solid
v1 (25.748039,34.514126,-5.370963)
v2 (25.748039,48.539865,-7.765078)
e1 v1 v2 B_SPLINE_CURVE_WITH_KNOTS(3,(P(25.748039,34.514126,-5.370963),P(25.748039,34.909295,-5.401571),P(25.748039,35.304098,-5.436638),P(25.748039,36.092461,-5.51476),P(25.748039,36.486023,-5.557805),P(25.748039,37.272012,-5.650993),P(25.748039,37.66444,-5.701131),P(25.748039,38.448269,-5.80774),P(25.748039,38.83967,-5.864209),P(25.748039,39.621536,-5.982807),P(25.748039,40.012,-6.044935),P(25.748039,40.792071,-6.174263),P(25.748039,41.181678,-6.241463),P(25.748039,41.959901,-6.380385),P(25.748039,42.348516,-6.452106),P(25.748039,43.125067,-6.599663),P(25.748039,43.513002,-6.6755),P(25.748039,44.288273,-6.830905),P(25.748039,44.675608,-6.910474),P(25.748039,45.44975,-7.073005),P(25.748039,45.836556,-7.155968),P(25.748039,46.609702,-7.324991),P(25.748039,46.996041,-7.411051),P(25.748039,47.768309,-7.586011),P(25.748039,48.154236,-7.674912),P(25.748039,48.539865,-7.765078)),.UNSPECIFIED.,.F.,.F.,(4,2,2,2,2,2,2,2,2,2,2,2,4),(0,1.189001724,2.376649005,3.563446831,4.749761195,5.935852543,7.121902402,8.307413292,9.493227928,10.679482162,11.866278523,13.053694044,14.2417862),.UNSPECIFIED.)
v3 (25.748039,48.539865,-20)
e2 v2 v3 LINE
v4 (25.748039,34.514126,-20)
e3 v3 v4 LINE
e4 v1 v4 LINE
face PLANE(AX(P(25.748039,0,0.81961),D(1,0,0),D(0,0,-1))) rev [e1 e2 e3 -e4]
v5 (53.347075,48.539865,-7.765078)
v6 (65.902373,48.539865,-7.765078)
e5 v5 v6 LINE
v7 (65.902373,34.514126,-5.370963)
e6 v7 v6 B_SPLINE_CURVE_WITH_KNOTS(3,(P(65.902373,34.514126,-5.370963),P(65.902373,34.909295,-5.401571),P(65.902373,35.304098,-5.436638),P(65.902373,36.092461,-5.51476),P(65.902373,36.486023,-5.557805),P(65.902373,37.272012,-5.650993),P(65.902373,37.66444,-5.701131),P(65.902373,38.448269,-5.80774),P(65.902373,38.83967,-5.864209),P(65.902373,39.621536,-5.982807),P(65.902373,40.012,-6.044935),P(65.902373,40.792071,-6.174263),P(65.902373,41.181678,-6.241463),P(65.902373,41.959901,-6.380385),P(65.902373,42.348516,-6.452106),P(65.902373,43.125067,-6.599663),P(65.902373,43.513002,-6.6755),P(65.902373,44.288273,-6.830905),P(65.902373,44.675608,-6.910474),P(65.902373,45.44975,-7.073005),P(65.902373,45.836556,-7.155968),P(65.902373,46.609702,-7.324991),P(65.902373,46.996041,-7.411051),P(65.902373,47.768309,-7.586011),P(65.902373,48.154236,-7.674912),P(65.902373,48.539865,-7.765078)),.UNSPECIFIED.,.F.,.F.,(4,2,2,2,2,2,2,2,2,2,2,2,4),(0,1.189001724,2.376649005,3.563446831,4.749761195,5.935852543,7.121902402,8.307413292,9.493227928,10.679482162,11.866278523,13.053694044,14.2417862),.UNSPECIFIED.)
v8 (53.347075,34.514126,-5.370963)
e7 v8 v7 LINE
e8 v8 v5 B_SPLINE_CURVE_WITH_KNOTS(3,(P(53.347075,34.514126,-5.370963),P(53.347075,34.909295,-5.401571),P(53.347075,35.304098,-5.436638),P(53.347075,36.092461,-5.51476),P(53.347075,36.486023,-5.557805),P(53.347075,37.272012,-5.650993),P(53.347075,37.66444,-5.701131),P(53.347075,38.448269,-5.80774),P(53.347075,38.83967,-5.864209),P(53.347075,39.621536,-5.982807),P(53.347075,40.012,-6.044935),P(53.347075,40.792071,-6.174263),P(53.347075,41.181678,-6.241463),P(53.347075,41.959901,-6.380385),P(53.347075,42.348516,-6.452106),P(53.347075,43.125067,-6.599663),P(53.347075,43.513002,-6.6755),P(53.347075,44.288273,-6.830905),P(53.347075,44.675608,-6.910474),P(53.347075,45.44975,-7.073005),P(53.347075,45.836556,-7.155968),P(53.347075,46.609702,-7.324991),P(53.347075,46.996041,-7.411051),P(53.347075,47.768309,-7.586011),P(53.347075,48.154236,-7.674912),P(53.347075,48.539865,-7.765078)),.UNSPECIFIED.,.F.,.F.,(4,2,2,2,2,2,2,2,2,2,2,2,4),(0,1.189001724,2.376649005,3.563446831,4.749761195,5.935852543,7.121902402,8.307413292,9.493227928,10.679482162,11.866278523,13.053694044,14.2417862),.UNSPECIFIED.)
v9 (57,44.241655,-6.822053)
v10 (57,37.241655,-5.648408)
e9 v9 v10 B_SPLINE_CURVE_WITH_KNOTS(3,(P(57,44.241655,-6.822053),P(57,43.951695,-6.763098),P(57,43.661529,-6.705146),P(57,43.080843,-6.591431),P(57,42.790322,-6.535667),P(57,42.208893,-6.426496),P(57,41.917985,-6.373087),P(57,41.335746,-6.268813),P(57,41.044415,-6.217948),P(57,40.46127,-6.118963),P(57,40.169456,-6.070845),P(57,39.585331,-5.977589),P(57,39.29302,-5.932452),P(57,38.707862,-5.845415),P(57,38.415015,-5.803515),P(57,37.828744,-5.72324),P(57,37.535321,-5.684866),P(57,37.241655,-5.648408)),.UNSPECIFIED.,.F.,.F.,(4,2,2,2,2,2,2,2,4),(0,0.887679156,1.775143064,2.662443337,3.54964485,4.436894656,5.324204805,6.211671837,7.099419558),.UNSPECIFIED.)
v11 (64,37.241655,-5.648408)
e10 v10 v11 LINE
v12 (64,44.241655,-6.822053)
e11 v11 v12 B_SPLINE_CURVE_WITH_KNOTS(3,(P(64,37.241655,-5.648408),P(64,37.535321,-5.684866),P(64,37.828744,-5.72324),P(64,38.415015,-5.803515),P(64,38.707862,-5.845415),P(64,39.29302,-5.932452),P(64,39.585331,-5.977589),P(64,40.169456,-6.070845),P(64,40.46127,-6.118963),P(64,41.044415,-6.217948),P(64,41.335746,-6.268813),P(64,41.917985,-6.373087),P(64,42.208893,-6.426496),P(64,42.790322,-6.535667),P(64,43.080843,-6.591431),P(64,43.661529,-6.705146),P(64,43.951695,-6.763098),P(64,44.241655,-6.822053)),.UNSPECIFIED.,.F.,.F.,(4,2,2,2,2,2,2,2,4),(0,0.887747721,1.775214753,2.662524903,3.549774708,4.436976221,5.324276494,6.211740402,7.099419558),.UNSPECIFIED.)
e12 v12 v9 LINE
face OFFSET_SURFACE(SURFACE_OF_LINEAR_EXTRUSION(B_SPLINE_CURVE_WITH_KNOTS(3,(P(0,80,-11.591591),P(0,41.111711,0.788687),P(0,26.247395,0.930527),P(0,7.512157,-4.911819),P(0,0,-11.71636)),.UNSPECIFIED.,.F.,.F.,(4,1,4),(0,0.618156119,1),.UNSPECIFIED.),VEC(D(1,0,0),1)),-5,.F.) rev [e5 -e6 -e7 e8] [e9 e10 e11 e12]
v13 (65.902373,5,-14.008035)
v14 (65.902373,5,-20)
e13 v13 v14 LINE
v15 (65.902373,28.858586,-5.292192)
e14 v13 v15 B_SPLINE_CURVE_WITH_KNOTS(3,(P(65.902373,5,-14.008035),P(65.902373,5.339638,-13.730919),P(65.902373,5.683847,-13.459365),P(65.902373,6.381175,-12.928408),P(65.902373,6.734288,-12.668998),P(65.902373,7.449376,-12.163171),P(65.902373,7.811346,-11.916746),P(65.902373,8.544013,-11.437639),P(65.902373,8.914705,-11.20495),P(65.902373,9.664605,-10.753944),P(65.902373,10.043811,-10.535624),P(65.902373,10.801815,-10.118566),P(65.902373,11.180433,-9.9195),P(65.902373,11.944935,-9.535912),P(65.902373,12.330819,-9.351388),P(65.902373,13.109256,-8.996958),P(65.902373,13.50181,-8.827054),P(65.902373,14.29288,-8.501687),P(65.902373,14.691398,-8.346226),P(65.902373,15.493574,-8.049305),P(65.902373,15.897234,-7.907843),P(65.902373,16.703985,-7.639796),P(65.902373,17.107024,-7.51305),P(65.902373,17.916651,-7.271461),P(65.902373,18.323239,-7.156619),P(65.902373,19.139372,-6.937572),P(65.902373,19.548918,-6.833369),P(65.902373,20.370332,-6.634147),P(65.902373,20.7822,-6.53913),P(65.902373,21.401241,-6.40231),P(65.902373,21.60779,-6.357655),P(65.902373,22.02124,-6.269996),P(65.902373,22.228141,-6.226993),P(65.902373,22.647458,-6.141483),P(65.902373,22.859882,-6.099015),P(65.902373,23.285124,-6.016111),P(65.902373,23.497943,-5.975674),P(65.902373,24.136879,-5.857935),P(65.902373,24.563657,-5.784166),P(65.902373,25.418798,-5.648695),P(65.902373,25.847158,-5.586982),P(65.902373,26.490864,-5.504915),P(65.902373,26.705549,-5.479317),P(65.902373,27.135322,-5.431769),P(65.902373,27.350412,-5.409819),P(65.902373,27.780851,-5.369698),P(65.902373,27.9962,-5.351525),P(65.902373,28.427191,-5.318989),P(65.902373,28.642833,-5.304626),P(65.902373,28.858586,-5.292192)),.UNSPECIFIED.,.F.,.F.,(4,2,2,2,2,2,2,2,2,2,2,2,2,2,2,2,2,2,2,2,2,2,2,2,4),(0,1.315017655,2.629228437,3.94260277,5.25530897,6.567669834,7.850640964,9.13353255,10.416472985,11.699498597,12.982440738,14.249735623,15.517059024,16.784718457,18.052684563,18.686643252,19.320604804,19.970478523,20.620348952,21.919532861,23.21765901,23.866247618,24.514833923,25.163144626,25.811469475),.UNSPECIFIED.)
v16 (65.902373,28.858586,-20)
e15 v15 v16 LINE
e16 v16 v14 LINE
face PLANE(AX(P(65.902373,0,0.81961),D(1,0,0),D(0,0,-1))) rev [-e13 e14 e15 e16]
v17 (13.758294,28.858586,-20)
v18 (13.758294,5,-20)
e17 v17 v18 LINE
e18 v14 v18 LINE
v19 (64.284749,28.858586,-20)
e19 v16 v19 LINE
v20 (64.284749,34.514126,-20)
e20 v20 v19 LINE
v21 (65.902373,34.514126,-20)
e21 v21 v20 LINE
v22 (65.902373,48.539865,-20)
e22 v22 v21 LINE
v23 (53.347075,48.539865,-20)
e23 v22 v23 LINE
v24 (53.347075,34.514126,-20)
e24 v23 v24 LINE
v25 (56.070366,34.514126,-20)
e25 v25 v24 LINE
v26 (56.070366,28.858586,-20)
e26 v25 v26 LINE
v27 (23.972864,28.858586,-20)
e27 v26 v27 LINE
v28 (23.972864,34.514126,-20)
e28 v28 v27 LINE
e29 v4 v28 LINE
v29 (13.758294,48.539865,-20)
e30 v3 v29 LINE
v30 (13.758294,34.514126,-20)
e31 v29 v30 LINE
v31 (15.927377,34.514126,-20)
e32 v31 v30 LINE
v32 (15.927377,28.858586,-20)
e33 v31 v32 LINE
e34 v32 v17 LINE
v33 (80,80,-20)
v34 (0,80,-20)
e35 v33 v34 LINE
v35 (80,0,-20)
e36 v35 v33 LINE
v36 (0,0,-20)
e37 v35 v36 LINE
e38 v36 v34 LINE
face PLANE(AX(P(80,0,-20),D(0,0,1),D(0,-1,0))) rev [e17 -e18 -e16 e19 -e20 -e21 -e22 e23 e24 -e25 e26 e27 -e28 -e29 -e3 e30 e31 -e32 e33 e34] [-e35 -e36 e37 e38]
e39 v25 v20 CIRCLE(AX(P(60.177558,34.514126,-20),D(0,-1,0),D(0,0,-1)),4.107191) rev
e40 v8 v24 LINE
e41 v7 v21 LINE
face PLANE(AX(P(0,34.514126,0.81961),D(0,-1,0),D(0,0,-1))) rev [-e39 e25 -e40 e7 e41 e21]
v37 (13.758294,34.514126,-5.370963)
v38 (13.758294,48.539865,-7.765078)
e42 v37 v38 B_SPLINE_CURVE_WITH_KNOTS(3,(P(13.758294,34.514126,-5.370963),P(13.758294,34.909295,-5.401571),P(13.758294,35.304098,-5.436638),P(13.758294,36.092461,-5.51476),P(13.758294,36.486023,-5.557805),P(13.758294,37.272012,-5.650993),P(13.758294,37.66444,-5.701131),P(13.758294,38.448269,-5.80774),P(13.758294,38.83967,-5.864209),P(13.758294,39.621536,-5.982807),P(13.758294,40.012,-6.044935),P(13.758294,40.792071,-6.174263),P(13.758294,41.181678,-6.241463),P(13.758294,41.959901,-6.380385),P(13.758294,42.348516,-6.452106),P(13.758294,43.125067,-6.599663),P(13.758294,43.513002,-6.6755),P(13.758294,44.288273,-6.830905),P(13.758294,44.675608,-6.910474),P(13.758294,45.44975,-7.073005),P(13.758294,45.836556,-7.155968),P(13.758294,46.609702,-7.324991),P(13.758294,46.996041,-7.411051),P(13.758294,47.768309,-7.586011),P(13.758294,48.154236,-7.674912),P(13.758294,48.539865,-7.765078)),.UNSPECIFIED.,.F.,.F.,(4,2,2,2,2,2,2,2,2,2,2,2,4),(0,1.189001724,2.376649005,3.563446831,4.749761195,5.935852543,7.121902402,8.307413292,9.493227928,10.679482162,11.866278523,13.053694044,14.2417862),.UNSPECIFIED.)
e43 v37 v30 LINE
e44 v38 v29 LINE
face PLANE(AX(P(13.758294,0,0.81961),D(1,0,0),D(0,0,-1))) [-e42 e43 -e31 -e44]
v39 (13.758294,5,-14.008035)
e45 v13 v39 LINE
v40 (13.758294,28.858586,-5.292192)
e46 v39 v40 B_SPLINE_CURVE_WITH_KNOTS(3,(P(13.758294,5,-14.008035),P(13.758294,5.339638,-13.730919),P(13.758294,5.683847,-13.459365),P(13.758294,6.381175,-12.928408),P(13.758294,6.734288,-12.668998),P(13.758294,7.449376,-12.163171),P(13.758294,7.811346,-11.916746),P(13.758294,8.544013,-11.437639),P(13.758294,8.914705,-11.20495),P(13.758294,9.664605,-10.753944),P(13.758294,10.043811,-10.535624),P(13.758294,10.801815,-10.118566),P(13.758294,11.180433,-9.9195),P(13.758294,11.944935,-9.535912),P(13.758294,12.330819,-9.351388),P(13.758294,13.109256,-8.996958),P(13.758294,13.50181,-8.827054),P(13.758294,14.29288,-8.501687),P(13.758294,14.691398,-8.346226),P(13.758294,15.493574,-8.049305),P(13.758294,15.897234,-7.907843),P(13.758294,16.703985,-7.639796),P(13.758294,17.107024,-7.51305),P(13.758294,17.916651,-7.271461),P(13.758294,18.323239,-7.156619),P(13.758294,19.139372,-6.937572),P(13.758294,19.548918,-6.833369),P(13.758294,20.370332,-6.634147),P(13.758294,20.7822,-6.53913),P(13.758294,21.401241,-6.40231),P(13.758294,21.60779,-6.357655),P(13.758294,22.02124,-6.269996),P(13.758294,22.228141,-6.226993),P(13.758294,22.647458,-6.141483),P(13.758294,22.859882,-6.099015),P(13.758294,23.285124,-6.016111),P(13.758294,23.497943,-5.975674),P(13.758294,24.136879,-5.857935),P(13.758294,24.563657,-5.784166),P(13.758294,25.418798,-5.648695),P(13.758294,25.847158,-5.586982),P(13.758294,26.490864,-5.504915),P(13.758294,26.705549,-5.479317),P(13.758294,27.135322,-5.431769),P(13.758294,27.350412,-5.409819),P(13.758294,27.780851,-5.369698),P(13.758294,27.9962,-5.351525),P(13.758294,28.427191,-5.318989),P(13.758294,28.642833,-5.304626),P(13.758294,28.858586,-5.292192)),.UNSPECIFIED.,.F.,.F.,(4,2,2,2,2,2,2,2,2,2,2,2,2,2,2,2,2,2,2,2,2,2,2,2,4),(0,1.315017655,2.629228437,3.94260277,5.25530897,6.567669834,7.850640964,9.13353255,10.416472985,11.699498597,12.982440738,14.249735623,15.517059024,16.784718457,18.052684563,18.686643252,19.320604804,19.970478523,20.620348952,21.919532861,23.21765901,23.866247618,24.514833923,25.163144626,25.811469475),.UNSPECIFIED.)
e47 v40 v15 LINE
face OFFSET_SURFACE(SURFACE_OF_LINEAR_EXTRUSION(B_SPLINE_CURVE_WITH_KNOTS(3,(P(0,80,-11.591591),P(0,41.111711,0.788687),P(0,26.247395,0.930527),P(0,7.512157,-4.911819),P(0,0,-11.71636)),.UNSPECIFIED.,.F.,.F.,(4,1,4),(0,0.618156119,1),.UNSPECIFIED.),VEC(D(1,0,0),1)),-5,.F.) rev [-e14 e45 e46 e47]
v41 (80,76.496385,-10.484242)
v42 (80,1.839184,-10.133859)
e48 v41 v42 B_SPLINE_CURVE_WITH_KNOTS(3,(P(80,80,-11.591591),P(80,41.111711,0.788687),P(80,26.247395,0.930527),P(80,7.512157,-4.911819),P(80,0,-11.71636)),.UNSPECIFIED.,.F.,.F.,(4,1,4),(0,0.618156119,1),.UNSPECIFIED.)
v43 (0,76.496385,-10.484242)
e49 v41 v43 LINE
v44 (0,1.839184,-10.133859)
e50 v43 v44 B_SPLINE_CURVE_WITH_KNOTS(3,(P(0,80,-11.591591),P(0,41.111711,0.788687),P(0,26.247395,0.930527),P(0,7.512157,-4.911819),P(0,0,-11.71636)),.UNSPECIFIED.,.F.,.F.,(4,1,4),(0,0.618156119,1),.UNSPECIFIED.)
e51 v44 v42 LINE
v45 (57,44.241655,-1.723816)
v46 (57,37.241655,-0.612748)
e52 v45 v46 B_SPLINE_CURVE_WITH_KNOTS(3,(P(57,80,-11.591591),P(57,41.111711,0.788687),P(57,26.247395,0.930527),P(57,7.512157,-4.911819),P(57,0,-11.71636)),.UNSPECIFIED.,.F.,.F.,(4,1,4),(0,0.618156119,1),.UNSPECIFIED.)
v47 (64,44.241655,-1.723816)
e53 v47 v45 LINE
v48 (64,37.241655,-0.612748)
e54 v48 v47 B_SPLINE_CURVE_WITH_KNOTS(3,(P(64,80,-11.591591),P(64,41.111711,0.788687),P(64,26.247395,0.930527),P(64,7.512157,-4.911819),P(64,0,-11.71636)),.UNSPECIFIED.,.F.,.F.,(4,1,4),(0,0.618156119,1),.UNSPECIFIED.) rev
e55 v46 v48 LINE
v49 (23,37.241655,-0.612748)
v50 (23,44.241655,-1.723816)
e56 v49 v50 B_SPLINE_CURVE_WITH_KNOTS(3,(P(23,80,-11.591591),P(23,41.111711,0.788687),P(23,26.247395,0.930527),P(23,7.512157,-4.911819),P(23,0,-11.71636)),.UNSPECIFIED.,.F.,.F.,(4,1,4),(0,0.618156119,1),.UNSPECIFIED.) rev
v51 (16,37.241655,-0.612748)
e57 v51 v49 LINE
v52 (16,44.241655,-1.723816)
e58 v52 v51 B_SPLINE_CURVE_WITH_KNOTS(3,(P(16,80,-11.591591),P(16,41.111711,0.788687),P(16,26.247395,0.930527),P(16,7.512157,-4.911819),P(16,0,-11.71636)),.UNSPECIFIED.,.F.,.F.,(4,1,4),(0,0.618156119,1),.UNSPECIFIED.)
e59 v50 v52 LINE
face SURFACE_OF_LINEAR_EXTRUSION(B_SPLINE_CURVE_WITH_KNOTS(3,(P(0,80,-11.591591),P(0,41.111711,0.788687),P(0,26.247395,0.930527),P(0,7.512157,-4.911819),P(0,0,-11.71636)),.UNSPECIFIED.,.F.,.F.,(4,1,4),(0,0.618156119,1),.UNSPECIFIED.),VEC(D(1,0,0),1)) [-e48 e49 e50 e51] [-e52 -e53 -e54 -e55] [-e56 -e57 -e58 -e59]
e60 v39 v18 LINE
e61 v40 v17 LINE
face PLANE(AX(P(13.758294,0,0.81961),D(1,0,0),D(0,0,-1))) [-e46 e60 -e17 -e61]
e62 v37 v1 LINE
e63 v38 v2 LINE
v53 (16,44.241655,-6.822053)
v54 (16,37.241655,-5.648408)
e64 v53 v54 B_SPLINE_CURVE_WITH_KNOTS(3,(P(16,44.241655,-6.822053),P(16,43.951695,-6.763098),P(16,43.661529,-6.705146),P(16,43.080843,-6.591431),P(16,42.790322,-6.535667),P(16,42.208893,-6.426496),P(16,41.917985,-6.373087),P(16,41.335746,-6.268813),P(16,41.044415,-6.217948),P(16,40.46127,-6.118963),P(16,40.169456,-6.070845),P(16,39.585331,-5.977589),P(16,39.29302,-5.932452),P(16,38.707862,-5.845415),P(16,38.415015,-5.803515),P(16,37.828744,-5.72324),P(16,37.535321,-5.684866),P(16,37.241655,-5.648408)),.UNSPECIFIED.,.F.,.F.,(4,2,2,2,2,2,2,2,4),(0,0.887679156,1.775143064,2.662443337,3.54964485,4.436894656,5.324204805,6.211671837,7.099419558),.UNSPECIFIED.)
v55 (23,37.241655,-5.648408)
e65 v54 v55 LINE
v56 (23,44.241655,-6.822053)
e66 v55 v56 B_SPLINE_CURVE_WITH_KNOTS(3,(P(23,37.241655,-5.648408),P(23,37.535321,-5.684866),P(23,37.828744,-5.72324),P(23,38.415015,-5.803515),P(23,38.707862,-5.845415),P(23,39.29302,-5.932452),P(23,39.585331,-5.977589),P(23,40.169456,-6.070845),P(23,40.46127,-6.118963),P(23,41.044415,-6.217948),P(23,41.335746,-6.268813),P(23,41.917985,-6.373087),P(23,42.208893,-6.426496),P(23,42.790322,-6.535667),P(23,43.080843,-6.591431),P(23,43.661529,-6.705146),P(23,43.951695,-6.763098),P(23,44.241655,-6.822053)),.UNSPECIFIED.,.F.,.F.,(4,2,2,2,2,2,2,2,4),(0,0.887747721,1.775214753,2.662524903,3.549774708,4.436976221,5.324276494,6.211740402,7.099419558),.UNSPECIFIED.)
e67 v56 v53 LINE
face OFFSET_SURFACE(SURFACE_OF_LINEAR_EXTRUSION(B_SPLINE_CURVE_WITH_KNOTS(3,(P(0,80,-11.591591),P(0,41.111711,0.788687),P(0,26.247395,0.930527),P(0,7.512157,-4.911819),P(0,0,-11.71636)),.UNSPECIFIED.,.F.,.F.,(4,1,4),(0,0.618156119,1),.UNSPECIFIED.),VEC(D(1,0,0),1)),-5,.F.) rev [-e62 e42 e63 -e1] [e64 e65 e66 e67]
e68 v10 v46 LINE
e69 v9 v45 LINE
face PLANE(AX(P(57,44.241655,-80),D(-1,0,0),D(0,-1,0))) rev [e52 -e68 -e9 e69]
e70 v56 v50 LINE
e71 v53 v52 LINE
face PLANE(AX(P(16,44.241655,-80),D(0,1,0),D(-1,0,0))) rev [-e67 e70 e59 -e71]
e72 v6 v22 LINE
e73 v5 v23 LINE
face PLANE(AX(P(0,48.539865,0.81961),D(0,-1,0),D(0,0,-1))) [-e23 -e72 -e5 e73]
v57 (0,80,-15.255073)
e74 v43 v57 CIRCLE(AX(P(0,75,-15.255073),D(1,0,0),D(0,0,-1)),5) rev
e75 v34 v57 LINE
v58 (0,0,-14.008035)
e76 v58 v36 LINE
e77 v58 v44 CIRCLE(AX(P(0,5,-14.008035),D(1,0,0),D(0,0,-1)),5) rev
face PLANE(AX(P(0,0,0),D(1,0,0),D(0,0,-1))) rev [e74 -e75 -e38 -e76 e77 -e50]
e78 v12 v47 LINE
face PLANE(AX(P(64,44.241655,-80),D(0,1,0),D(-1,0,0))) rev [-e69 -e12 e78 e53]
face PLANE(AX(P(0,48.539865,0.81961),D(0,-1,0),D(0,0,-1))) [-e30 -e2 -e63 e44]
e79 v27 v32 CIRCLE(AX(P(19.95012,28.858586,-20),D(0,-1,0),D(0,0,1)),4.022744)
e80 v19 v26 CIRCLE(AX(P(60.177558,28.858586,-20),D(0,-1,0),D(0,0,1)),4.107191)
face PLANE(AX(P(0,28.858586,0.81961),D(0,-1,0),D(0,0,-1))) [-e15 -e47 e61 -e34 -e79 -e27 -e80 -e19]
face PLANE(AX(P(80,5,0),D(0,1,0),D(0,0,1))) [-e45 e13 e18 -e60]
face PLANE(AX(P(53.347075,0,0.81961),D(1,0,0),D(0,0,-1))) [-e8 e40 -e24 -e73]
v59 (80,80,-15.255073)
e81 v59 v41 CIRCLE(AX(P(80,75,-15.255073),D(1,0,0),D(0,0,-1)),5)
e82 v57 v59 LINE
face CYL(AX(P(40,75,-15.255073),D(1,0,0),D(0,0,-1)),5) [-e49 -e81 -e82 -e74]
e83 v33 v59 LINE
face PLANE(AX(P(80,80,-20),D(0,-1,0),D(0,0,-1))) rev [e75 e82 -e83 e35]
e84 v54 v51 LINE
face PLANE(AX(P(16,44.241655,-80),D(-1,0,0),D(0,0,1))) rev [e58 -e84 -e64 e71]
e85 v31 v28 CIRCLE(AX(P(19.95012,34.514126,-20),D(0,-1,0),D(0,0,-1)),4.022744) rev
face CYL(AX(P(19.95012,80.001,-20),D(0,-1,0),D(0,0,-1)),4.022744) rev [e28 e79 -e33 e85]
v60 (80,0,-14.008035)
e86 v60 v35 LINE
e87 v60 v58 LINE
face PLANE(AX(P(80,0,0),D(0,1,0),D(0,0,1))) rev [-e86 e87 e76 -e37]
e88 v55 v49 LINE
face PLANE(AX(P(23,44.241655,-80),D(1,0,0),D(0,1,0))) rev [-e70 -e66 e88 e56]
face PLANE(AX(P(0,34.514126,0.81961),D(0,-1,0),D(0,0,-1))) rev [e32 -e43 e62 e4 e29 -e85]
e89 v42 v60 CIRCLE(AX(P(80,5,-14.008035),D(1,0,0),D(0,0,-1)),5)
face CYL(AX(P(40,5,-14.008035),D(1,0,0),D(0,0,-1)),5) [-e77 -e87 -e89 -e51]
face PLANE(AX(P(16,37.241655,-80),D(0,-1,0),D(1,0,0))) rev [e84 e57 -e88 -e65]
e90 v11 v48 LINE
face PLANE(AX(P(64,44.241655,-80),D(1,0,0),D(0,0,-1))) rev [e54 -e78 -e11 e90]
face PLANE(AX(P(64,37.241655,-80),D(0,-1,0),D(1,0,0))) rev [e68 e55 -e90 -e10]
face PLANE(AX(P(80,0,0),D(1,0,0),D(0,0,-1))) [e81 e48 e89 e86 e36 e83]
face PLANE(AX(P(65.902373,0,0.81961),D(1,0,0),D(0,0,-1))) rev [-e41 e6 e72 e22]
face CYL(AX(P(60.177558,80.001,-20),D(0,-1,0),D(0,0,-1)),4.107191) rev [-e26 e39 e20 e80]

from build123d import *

# Parameters (mm, degrees)
SKETCH_1_W          = 20
SKETCH_1_H          = 80
EXTRUDE_1_DEPTH     = 80
CUT_EXTRUDE_1_DEPTH = 80
FILLET_1_R          = 5
SHELL_START         = 5
SHELL_3_DEPTH       = 70
SKETCH_3_W          = 7
SKETCH_3_H          = 7
CUT_EXTRUDE_3_DEPTH = 80
EXTRUDE_2_REACH     = 116.851
SKETCH_5_W          = 27.599035465
SKETCH_5_H          = 14.025739335
CUT_EXTRUDE_4_REACH = 99.033


# Read off the part's stored shape, not the designer's step: 쉘3
with BuildPart() as part:
    # 스케치1 → 보스-돌출1 (new body)
    with BuildSketch(Plane(origin=(0, 0, 0), x_dir=(0, 0, -1), z_dir=(1, 0, 0))):
        with Locations((10, 40)):
            Rectangle(SKETCH_1_W, SKETCH_1_H)
    extrude(amount=EXTRUDE_1_DEPTH)

    # 스케치2 → 컷-돌출1 (cut)
    with BuildSketch(Plane(origin=(80, 0, 0), x_dir=(0, 0, -1), z_dir=(1, 0, 0))):
        with BuildLine():
            Line((11.591590564, 80), (0, 80))
            Line((0, 80), (0, 0))
            Line((0, 0), (11.716359911, 0))
            add(Edge.make_bspline(
                [(11.591590564, 80), (-0.788687354, 41.111711297), (-0.930526633, 26.247395441), (4.911818792, 7.512157383), (11.716359911, 0)],
                knots=[0, 0, 0, 0, 0.618156119, 1, 1, 1, 1], degree=3))
        make_face()
    extrude(amount=-CUT_EXTRUDE_1_DEPTH, mode=Mode.SUBTRACT)

    # 필렛1
    fillet_1_edges = [part.edges().sort_by_distance(p)[0] for p in [
        (40, 0, -11.716359911),
        (40, 80, -11.591590564),
    ]]
    fillet(fillet_1_edges, radius=FILLET_1_R)

    # 쉘3 outline → 쉘3 (cut)
    with BuildSketch(Plane.YZ.offset(SHELL_START)):
        with BuildLine():
            Line((75, -20), (74.999999784, -15.255073686))
            add(Edge.make_bspline(
                [(74.999999784, -15.255073686), (67.829779133, -13.006113736), (61.460626662, -11.089637393), (55.828308111, -9.484643566), (50.869216464, -8.170232316), (46.521341581, -7.124664573), (42.721071813, -6.328318286), (39.413038096, -5.75562944), (36.528279577, -5.38717997), (34.019435823, -5.193621195), (31.801971368, -5.138118071), (29.778808064, -5.199766787), (27.603301228, -5.385408593), (27.354777332, -5.408490332), (27.107693601, -5.433274029), (26.861838696, -5.459730531), (26.617002242, -5.487832823), (26.37297533, -5.51755571), (26.129551021, -5.548875499), (25.886524852, -5.58176968), (25.643695341, -5.616216611), (25.400864489, -5.652195196), (25.157838288, -5.689684571), (24.792721691, -5.74815339), (24.670919935, -5.768015368), (24.548998185, -5.788247154), (24.426932957, -5.808846127), (24.304701052, -5.829809608), (24.182279559, -5.851134857), (24.059645852, -5.872819075), (23.936777592, -5.894859408), (23.813652725, -5.917252938), (23.690249485, -5.939996692), (23.566546391, -5.963087636), (23.380510176, -5.9982402), (23.318417709, -6.010043782), (23.256242285, -6.021932999), (23.19398134, -6.033907425), (23.131632313, -6.045966636), (23.069192642, -6.058110205), (23.006659764, -6.070337707), (22.944031116, -6.082648717), (22.881304137, -6.095042809), (22.818476264, -6.107519557), (22.755544936, -6.120078536), (22.660988915, -6.139039713), (22.629443763, -6.145380547), (22.597871828, -6.151741763), (22.566272805, -6.158123302), (22.534646389, -6.164525103), (22.502992275, -6.170947108), (22.47131016, -6.177389256), (22.439599737, -6.183851489), (22.407860702, -6.190333746), (22.376092751, -6.196835968), (22.344295578, -6.203358095), (22.28064218, -6.216442041), (22.248806222, -6.222999664), (22.216787665, -6.229608787), (22.185173002, -6.236146877), (22.153078028, -6.242800703), (22.121376446, -6.249383567), (22.089482075, -6.256023898), (22.057634411, -6.262666185), (22.025810888, -6.269319179), (21.993971685, -6.275989337), (21.962144136, -6.282671775), (21.421131548, -6.396511112), (20.913058418, -6.507182675), (20.406011367, -6.621904848), (19.899891415, -6.741190042), (19.394589314, -6.865543681), (18.889985152, -6.995466763), (18.385947953, -7.131458412), (17.882335283, -7.274018442), (17.378992852, -7.423649906), (16.875754115, -7.580861664), (16.372439878, -7.746170929), (14.987735061, -8.224441618), (14.105794888, -8.555181627), (13.222026102, -8.915168442), (12.335314555, -9.307325609), (11.444469206, -9.734725562), (10.548267461, -10.200624762), (9.645511658, -10.708471458), (8.735088494, -11.261891437), (7.816023195, -11.864657175), (6.887520219, -12.520645756), (5.94898228, -13.233790964), (4.999999509, -14.008034922)],
                knots=[0.019005596, 0.019005596, 0.019005596, 0.019005596, 0.019005596, 0.019005596, 0.019005596, 0.019005596, 0.019005596, 0.019005596, 0.019005596, 0.019005596, 0.019005596, 0.5, 0.5, 0.5, 0.5, 0.5, 0.5, 0.5, 0.5, 0.5, 0.5, 0.5, 0.5625, 0.5625, 0.5625, 0.5625, 0.5625, 0.5625, 0.5625, 0.5625, 0.5625, 0.5625, 0.5625, 0.59375, 0.59375, 0.59375, 0.59375, 0.59375, 0.59375, 0.59375, 0.59375, 0.59375, 0.59375, 0.59375, 0.609375, 0.609375, 0.609375, 0.609375, 0.609375, 0.609375, 0.609375, 0.609375, 0.609375, 0.609375, 0.609375, 0.6171875, 0.6171875, 0.6171875, 0.6171875, 0.6171875, 0.6171875, 0.6171875, 0.6171875, 0.6171875, 0.6171875, 0.6171875, 0.625, 0.625, 0.625, 0.625, 0.625, 0.625, 0.625, 0.625, 0.625, 0.625, 0.625, 0.75, 0.75, 0.75, 0.75, 0.75, 0.75, 0.75, 0.75, 0.75, 0.75, 0.75, 0.968713852, 0.968713852, 0.968713852, 0.968713852, 0.968713852, 0.968713852, 0.968713852, 0.968713852, 0.968713852, 0.968713852, 0.968713852, 0.968713852, 0.968713852], degree=12))
            Line((4.999999509, -14.008034922), (5, -20))
            Line((5, -20), (75, -20))
        make_face()
    extrude(amount=SHELL_3_DEPTH, mode=Mode.SUBTRACT)

    # 스케치3 → 컷-돌출3 (cut)
    with BuildSketch(Plane.XY):
        with Locations((19.5, 40.741655041)):
            Rectangle(SKETCH_3_W, SKETCH_3_H)
        with Locations((60.5, 40.741655041)):
            Rectangle(SKETCH_3_W, SKETCH_3_H)
    extrude(amount=-CUT_EXTRUDE_3_DEPTH, mode=Mode.SUBTRACT)

    # 스케치5 → 보스-돌출2 (add, up to next)
    with BuildSketch(Plane(origin=(0, 0, -20), x_dir=(-1, 0, 0), z_dir=(0, 0, -1)), mode=Mode.PRIVATE) as extrude_2_sk1:
        Polygon((-5, 75), (-75, 75), (-75, 48.539865482), (-65.902373449, 48.539865482), (-53.347074528, 48.539865482), (-25.748039063, 48.539865482), (-13.758294148, 48.539865482), (-5, 48.539865482), align=None)
    extrude_2_tool1 = extrude(extrude_2_sk1.sketch, amount=-EXTRUDE_2_REACH, mode=Mode.PRIVATE) - part.part
    # 스케치5 → 보스-돌출2 (add, up to next)
    with BuildSketch(Plane(origin=(0, 0, -20), x_dir=(-1, 0, 0), z_dir=(0, 0, -1)), mode=Mode.PRIVATE) as extrude_2_sk2:
        Polygon((-65.902373449, 48.539865482), (-75, 48.539865482), (-75, 5), (-65.902373449, 5), (-65.902373449, 28.858586093), (-65.902373449, 34.514126147), align=None)
    extrude_2_tool2 = extrude(extrude_2_sk2.sketch, amount=-EXTRUDE_2_REACH, mode=Mode.PRIVATE) - part.part
    # 스케치5 → 보스-돌출2 (add, up to next)
    with BuildSketch(Plane(origin=(0, 0, -20), x_dir=(-1, 0, 0), z_dir=(0, 0, -1)), mode=Mode.PRIVATE) as extrude_2_sk3:
        with Locations((-39.547556796, 41.526995814)):
            Rectangle(SKETCH_5_W, SKETCH_5_H)
    extrude_2_tool3 = extrude(extrude_2_sk3.sketch, amount=-EXTRUDE_2_REACH, mode=Mode.PRIVATE) - part.part
    # 스케치5 → 보스-돌출2 (add, up to next)
    with BuildSketch(Plane(origin=(0, 0, -20), x_dir=(-1, 0, 0), z_dir=(0, 0, -1)), mode=Mode.PRIVATE) as extrude_2_sk4:
        Polygon((-53.347074528, 34.514126147), (-65.902373449, 34.514126147), (-65.902373449, 28.858586093), (-13.758294148, 28.858586093), (-13.758294148, 34.514126147), (-25.748039063, 34.514126147), align=None)
    extrude_2_tool4 = extrude(extrude_2_sk4.sketch, amount=-EXTRUDE_2_REACH, mode=Mode.PRIVATE) - part.part
    # 스케치5 → 보스-돌출2 (add, up to next)
    with BuildSketch(Plane(origin=(0, 0, -20), x_dir=(-1, 0, 0), z_dir=(0, 0, -1)), mode=Mode.PRIVATE) as extrude_2_sk5:
        Polygon((-5, 5), (-5, 48.539865482), (-13.758294148, 48.539865482), (-13.758294148, 34.514126147), (-13.758294148, 28.858586093), (-13.758294148, 5), align=None)
    extrude_2_tool5 = extrude(extrude_2_sk5.sketch, amount=-EXTRUDE_2_REACH, mode=Mode.PRIVATE) - part.part
    add(extrude_2_tool1.solids().sort_by_distance((40, 61.769933, -20))[0])
    add(extrude_2_tool2.solids().sort_by_distance((70.451187, 26.769933, -20))[0])
    add(extrude_2_tool3.solids().sort_by_distance((39.547557, 41.526996, -20))[0])
    add(extrude_2_tool4.solids().sort_by_distance((39.830334, 31.686356, -20))[0])
    add(extrude_2_tool5.solids().sort_by_distance((9.379147, 26.769933, -20))[0])

    # 스케치6 → 컷-돌출4 (cut, up to next)
    with BuildSketch(Plane.XZ.offset(-28.858586093), mode=Mode.PRIVATE) as cut_extrude_4_sk1:
        with BuildLine():
            Line((15.927376618, -20), (23.972864062, -20))
            ThreePointArc((23.972864062, -20), (19.95012034, -15.977256278), (15.927376618, -20))
        make_face()
    cut_extrude_4_tool1 = extrude(cut_extrude_4_sk1.sketch, amount=-CUT_EXTRUDE_4_REACH, mode=Mode.PRIVATE) & part.part
    # 스케치6 → 컷-돌출4 (cut, up to next)
    with BuildSketch(Plane.XZ.offset(-28.858586093), mode=Mode.PRIVATE) as cut_extrude_4_sk2:
        with BuildLine():
            Line((56.070366463, -20), (64.284748666, -20))
            ThreePointArc((64.284748666, -20), (60.177557564, -15.892808898), (56.070366463, -20))
        make_face()
    cut_extrude_4_tool2 = extrude(cut_extrude_4_sk2.sketch, amount=-CUT_EXTRUDE_4_REACH, mode=Mode.PRIVATE) & part.part
    add(cut_extrude_4_tool1.solids().sort_by_distance((19.95012, 28.858586, -18.292695))[0], mode=Mode.SUBTRACT)
    add(cut_extrude_4_tool2.solids().sort_by_distance((60.177558, 28.858586, -18.256854))[0], mode=Mode.SUBTRACT)


solid = part.part
